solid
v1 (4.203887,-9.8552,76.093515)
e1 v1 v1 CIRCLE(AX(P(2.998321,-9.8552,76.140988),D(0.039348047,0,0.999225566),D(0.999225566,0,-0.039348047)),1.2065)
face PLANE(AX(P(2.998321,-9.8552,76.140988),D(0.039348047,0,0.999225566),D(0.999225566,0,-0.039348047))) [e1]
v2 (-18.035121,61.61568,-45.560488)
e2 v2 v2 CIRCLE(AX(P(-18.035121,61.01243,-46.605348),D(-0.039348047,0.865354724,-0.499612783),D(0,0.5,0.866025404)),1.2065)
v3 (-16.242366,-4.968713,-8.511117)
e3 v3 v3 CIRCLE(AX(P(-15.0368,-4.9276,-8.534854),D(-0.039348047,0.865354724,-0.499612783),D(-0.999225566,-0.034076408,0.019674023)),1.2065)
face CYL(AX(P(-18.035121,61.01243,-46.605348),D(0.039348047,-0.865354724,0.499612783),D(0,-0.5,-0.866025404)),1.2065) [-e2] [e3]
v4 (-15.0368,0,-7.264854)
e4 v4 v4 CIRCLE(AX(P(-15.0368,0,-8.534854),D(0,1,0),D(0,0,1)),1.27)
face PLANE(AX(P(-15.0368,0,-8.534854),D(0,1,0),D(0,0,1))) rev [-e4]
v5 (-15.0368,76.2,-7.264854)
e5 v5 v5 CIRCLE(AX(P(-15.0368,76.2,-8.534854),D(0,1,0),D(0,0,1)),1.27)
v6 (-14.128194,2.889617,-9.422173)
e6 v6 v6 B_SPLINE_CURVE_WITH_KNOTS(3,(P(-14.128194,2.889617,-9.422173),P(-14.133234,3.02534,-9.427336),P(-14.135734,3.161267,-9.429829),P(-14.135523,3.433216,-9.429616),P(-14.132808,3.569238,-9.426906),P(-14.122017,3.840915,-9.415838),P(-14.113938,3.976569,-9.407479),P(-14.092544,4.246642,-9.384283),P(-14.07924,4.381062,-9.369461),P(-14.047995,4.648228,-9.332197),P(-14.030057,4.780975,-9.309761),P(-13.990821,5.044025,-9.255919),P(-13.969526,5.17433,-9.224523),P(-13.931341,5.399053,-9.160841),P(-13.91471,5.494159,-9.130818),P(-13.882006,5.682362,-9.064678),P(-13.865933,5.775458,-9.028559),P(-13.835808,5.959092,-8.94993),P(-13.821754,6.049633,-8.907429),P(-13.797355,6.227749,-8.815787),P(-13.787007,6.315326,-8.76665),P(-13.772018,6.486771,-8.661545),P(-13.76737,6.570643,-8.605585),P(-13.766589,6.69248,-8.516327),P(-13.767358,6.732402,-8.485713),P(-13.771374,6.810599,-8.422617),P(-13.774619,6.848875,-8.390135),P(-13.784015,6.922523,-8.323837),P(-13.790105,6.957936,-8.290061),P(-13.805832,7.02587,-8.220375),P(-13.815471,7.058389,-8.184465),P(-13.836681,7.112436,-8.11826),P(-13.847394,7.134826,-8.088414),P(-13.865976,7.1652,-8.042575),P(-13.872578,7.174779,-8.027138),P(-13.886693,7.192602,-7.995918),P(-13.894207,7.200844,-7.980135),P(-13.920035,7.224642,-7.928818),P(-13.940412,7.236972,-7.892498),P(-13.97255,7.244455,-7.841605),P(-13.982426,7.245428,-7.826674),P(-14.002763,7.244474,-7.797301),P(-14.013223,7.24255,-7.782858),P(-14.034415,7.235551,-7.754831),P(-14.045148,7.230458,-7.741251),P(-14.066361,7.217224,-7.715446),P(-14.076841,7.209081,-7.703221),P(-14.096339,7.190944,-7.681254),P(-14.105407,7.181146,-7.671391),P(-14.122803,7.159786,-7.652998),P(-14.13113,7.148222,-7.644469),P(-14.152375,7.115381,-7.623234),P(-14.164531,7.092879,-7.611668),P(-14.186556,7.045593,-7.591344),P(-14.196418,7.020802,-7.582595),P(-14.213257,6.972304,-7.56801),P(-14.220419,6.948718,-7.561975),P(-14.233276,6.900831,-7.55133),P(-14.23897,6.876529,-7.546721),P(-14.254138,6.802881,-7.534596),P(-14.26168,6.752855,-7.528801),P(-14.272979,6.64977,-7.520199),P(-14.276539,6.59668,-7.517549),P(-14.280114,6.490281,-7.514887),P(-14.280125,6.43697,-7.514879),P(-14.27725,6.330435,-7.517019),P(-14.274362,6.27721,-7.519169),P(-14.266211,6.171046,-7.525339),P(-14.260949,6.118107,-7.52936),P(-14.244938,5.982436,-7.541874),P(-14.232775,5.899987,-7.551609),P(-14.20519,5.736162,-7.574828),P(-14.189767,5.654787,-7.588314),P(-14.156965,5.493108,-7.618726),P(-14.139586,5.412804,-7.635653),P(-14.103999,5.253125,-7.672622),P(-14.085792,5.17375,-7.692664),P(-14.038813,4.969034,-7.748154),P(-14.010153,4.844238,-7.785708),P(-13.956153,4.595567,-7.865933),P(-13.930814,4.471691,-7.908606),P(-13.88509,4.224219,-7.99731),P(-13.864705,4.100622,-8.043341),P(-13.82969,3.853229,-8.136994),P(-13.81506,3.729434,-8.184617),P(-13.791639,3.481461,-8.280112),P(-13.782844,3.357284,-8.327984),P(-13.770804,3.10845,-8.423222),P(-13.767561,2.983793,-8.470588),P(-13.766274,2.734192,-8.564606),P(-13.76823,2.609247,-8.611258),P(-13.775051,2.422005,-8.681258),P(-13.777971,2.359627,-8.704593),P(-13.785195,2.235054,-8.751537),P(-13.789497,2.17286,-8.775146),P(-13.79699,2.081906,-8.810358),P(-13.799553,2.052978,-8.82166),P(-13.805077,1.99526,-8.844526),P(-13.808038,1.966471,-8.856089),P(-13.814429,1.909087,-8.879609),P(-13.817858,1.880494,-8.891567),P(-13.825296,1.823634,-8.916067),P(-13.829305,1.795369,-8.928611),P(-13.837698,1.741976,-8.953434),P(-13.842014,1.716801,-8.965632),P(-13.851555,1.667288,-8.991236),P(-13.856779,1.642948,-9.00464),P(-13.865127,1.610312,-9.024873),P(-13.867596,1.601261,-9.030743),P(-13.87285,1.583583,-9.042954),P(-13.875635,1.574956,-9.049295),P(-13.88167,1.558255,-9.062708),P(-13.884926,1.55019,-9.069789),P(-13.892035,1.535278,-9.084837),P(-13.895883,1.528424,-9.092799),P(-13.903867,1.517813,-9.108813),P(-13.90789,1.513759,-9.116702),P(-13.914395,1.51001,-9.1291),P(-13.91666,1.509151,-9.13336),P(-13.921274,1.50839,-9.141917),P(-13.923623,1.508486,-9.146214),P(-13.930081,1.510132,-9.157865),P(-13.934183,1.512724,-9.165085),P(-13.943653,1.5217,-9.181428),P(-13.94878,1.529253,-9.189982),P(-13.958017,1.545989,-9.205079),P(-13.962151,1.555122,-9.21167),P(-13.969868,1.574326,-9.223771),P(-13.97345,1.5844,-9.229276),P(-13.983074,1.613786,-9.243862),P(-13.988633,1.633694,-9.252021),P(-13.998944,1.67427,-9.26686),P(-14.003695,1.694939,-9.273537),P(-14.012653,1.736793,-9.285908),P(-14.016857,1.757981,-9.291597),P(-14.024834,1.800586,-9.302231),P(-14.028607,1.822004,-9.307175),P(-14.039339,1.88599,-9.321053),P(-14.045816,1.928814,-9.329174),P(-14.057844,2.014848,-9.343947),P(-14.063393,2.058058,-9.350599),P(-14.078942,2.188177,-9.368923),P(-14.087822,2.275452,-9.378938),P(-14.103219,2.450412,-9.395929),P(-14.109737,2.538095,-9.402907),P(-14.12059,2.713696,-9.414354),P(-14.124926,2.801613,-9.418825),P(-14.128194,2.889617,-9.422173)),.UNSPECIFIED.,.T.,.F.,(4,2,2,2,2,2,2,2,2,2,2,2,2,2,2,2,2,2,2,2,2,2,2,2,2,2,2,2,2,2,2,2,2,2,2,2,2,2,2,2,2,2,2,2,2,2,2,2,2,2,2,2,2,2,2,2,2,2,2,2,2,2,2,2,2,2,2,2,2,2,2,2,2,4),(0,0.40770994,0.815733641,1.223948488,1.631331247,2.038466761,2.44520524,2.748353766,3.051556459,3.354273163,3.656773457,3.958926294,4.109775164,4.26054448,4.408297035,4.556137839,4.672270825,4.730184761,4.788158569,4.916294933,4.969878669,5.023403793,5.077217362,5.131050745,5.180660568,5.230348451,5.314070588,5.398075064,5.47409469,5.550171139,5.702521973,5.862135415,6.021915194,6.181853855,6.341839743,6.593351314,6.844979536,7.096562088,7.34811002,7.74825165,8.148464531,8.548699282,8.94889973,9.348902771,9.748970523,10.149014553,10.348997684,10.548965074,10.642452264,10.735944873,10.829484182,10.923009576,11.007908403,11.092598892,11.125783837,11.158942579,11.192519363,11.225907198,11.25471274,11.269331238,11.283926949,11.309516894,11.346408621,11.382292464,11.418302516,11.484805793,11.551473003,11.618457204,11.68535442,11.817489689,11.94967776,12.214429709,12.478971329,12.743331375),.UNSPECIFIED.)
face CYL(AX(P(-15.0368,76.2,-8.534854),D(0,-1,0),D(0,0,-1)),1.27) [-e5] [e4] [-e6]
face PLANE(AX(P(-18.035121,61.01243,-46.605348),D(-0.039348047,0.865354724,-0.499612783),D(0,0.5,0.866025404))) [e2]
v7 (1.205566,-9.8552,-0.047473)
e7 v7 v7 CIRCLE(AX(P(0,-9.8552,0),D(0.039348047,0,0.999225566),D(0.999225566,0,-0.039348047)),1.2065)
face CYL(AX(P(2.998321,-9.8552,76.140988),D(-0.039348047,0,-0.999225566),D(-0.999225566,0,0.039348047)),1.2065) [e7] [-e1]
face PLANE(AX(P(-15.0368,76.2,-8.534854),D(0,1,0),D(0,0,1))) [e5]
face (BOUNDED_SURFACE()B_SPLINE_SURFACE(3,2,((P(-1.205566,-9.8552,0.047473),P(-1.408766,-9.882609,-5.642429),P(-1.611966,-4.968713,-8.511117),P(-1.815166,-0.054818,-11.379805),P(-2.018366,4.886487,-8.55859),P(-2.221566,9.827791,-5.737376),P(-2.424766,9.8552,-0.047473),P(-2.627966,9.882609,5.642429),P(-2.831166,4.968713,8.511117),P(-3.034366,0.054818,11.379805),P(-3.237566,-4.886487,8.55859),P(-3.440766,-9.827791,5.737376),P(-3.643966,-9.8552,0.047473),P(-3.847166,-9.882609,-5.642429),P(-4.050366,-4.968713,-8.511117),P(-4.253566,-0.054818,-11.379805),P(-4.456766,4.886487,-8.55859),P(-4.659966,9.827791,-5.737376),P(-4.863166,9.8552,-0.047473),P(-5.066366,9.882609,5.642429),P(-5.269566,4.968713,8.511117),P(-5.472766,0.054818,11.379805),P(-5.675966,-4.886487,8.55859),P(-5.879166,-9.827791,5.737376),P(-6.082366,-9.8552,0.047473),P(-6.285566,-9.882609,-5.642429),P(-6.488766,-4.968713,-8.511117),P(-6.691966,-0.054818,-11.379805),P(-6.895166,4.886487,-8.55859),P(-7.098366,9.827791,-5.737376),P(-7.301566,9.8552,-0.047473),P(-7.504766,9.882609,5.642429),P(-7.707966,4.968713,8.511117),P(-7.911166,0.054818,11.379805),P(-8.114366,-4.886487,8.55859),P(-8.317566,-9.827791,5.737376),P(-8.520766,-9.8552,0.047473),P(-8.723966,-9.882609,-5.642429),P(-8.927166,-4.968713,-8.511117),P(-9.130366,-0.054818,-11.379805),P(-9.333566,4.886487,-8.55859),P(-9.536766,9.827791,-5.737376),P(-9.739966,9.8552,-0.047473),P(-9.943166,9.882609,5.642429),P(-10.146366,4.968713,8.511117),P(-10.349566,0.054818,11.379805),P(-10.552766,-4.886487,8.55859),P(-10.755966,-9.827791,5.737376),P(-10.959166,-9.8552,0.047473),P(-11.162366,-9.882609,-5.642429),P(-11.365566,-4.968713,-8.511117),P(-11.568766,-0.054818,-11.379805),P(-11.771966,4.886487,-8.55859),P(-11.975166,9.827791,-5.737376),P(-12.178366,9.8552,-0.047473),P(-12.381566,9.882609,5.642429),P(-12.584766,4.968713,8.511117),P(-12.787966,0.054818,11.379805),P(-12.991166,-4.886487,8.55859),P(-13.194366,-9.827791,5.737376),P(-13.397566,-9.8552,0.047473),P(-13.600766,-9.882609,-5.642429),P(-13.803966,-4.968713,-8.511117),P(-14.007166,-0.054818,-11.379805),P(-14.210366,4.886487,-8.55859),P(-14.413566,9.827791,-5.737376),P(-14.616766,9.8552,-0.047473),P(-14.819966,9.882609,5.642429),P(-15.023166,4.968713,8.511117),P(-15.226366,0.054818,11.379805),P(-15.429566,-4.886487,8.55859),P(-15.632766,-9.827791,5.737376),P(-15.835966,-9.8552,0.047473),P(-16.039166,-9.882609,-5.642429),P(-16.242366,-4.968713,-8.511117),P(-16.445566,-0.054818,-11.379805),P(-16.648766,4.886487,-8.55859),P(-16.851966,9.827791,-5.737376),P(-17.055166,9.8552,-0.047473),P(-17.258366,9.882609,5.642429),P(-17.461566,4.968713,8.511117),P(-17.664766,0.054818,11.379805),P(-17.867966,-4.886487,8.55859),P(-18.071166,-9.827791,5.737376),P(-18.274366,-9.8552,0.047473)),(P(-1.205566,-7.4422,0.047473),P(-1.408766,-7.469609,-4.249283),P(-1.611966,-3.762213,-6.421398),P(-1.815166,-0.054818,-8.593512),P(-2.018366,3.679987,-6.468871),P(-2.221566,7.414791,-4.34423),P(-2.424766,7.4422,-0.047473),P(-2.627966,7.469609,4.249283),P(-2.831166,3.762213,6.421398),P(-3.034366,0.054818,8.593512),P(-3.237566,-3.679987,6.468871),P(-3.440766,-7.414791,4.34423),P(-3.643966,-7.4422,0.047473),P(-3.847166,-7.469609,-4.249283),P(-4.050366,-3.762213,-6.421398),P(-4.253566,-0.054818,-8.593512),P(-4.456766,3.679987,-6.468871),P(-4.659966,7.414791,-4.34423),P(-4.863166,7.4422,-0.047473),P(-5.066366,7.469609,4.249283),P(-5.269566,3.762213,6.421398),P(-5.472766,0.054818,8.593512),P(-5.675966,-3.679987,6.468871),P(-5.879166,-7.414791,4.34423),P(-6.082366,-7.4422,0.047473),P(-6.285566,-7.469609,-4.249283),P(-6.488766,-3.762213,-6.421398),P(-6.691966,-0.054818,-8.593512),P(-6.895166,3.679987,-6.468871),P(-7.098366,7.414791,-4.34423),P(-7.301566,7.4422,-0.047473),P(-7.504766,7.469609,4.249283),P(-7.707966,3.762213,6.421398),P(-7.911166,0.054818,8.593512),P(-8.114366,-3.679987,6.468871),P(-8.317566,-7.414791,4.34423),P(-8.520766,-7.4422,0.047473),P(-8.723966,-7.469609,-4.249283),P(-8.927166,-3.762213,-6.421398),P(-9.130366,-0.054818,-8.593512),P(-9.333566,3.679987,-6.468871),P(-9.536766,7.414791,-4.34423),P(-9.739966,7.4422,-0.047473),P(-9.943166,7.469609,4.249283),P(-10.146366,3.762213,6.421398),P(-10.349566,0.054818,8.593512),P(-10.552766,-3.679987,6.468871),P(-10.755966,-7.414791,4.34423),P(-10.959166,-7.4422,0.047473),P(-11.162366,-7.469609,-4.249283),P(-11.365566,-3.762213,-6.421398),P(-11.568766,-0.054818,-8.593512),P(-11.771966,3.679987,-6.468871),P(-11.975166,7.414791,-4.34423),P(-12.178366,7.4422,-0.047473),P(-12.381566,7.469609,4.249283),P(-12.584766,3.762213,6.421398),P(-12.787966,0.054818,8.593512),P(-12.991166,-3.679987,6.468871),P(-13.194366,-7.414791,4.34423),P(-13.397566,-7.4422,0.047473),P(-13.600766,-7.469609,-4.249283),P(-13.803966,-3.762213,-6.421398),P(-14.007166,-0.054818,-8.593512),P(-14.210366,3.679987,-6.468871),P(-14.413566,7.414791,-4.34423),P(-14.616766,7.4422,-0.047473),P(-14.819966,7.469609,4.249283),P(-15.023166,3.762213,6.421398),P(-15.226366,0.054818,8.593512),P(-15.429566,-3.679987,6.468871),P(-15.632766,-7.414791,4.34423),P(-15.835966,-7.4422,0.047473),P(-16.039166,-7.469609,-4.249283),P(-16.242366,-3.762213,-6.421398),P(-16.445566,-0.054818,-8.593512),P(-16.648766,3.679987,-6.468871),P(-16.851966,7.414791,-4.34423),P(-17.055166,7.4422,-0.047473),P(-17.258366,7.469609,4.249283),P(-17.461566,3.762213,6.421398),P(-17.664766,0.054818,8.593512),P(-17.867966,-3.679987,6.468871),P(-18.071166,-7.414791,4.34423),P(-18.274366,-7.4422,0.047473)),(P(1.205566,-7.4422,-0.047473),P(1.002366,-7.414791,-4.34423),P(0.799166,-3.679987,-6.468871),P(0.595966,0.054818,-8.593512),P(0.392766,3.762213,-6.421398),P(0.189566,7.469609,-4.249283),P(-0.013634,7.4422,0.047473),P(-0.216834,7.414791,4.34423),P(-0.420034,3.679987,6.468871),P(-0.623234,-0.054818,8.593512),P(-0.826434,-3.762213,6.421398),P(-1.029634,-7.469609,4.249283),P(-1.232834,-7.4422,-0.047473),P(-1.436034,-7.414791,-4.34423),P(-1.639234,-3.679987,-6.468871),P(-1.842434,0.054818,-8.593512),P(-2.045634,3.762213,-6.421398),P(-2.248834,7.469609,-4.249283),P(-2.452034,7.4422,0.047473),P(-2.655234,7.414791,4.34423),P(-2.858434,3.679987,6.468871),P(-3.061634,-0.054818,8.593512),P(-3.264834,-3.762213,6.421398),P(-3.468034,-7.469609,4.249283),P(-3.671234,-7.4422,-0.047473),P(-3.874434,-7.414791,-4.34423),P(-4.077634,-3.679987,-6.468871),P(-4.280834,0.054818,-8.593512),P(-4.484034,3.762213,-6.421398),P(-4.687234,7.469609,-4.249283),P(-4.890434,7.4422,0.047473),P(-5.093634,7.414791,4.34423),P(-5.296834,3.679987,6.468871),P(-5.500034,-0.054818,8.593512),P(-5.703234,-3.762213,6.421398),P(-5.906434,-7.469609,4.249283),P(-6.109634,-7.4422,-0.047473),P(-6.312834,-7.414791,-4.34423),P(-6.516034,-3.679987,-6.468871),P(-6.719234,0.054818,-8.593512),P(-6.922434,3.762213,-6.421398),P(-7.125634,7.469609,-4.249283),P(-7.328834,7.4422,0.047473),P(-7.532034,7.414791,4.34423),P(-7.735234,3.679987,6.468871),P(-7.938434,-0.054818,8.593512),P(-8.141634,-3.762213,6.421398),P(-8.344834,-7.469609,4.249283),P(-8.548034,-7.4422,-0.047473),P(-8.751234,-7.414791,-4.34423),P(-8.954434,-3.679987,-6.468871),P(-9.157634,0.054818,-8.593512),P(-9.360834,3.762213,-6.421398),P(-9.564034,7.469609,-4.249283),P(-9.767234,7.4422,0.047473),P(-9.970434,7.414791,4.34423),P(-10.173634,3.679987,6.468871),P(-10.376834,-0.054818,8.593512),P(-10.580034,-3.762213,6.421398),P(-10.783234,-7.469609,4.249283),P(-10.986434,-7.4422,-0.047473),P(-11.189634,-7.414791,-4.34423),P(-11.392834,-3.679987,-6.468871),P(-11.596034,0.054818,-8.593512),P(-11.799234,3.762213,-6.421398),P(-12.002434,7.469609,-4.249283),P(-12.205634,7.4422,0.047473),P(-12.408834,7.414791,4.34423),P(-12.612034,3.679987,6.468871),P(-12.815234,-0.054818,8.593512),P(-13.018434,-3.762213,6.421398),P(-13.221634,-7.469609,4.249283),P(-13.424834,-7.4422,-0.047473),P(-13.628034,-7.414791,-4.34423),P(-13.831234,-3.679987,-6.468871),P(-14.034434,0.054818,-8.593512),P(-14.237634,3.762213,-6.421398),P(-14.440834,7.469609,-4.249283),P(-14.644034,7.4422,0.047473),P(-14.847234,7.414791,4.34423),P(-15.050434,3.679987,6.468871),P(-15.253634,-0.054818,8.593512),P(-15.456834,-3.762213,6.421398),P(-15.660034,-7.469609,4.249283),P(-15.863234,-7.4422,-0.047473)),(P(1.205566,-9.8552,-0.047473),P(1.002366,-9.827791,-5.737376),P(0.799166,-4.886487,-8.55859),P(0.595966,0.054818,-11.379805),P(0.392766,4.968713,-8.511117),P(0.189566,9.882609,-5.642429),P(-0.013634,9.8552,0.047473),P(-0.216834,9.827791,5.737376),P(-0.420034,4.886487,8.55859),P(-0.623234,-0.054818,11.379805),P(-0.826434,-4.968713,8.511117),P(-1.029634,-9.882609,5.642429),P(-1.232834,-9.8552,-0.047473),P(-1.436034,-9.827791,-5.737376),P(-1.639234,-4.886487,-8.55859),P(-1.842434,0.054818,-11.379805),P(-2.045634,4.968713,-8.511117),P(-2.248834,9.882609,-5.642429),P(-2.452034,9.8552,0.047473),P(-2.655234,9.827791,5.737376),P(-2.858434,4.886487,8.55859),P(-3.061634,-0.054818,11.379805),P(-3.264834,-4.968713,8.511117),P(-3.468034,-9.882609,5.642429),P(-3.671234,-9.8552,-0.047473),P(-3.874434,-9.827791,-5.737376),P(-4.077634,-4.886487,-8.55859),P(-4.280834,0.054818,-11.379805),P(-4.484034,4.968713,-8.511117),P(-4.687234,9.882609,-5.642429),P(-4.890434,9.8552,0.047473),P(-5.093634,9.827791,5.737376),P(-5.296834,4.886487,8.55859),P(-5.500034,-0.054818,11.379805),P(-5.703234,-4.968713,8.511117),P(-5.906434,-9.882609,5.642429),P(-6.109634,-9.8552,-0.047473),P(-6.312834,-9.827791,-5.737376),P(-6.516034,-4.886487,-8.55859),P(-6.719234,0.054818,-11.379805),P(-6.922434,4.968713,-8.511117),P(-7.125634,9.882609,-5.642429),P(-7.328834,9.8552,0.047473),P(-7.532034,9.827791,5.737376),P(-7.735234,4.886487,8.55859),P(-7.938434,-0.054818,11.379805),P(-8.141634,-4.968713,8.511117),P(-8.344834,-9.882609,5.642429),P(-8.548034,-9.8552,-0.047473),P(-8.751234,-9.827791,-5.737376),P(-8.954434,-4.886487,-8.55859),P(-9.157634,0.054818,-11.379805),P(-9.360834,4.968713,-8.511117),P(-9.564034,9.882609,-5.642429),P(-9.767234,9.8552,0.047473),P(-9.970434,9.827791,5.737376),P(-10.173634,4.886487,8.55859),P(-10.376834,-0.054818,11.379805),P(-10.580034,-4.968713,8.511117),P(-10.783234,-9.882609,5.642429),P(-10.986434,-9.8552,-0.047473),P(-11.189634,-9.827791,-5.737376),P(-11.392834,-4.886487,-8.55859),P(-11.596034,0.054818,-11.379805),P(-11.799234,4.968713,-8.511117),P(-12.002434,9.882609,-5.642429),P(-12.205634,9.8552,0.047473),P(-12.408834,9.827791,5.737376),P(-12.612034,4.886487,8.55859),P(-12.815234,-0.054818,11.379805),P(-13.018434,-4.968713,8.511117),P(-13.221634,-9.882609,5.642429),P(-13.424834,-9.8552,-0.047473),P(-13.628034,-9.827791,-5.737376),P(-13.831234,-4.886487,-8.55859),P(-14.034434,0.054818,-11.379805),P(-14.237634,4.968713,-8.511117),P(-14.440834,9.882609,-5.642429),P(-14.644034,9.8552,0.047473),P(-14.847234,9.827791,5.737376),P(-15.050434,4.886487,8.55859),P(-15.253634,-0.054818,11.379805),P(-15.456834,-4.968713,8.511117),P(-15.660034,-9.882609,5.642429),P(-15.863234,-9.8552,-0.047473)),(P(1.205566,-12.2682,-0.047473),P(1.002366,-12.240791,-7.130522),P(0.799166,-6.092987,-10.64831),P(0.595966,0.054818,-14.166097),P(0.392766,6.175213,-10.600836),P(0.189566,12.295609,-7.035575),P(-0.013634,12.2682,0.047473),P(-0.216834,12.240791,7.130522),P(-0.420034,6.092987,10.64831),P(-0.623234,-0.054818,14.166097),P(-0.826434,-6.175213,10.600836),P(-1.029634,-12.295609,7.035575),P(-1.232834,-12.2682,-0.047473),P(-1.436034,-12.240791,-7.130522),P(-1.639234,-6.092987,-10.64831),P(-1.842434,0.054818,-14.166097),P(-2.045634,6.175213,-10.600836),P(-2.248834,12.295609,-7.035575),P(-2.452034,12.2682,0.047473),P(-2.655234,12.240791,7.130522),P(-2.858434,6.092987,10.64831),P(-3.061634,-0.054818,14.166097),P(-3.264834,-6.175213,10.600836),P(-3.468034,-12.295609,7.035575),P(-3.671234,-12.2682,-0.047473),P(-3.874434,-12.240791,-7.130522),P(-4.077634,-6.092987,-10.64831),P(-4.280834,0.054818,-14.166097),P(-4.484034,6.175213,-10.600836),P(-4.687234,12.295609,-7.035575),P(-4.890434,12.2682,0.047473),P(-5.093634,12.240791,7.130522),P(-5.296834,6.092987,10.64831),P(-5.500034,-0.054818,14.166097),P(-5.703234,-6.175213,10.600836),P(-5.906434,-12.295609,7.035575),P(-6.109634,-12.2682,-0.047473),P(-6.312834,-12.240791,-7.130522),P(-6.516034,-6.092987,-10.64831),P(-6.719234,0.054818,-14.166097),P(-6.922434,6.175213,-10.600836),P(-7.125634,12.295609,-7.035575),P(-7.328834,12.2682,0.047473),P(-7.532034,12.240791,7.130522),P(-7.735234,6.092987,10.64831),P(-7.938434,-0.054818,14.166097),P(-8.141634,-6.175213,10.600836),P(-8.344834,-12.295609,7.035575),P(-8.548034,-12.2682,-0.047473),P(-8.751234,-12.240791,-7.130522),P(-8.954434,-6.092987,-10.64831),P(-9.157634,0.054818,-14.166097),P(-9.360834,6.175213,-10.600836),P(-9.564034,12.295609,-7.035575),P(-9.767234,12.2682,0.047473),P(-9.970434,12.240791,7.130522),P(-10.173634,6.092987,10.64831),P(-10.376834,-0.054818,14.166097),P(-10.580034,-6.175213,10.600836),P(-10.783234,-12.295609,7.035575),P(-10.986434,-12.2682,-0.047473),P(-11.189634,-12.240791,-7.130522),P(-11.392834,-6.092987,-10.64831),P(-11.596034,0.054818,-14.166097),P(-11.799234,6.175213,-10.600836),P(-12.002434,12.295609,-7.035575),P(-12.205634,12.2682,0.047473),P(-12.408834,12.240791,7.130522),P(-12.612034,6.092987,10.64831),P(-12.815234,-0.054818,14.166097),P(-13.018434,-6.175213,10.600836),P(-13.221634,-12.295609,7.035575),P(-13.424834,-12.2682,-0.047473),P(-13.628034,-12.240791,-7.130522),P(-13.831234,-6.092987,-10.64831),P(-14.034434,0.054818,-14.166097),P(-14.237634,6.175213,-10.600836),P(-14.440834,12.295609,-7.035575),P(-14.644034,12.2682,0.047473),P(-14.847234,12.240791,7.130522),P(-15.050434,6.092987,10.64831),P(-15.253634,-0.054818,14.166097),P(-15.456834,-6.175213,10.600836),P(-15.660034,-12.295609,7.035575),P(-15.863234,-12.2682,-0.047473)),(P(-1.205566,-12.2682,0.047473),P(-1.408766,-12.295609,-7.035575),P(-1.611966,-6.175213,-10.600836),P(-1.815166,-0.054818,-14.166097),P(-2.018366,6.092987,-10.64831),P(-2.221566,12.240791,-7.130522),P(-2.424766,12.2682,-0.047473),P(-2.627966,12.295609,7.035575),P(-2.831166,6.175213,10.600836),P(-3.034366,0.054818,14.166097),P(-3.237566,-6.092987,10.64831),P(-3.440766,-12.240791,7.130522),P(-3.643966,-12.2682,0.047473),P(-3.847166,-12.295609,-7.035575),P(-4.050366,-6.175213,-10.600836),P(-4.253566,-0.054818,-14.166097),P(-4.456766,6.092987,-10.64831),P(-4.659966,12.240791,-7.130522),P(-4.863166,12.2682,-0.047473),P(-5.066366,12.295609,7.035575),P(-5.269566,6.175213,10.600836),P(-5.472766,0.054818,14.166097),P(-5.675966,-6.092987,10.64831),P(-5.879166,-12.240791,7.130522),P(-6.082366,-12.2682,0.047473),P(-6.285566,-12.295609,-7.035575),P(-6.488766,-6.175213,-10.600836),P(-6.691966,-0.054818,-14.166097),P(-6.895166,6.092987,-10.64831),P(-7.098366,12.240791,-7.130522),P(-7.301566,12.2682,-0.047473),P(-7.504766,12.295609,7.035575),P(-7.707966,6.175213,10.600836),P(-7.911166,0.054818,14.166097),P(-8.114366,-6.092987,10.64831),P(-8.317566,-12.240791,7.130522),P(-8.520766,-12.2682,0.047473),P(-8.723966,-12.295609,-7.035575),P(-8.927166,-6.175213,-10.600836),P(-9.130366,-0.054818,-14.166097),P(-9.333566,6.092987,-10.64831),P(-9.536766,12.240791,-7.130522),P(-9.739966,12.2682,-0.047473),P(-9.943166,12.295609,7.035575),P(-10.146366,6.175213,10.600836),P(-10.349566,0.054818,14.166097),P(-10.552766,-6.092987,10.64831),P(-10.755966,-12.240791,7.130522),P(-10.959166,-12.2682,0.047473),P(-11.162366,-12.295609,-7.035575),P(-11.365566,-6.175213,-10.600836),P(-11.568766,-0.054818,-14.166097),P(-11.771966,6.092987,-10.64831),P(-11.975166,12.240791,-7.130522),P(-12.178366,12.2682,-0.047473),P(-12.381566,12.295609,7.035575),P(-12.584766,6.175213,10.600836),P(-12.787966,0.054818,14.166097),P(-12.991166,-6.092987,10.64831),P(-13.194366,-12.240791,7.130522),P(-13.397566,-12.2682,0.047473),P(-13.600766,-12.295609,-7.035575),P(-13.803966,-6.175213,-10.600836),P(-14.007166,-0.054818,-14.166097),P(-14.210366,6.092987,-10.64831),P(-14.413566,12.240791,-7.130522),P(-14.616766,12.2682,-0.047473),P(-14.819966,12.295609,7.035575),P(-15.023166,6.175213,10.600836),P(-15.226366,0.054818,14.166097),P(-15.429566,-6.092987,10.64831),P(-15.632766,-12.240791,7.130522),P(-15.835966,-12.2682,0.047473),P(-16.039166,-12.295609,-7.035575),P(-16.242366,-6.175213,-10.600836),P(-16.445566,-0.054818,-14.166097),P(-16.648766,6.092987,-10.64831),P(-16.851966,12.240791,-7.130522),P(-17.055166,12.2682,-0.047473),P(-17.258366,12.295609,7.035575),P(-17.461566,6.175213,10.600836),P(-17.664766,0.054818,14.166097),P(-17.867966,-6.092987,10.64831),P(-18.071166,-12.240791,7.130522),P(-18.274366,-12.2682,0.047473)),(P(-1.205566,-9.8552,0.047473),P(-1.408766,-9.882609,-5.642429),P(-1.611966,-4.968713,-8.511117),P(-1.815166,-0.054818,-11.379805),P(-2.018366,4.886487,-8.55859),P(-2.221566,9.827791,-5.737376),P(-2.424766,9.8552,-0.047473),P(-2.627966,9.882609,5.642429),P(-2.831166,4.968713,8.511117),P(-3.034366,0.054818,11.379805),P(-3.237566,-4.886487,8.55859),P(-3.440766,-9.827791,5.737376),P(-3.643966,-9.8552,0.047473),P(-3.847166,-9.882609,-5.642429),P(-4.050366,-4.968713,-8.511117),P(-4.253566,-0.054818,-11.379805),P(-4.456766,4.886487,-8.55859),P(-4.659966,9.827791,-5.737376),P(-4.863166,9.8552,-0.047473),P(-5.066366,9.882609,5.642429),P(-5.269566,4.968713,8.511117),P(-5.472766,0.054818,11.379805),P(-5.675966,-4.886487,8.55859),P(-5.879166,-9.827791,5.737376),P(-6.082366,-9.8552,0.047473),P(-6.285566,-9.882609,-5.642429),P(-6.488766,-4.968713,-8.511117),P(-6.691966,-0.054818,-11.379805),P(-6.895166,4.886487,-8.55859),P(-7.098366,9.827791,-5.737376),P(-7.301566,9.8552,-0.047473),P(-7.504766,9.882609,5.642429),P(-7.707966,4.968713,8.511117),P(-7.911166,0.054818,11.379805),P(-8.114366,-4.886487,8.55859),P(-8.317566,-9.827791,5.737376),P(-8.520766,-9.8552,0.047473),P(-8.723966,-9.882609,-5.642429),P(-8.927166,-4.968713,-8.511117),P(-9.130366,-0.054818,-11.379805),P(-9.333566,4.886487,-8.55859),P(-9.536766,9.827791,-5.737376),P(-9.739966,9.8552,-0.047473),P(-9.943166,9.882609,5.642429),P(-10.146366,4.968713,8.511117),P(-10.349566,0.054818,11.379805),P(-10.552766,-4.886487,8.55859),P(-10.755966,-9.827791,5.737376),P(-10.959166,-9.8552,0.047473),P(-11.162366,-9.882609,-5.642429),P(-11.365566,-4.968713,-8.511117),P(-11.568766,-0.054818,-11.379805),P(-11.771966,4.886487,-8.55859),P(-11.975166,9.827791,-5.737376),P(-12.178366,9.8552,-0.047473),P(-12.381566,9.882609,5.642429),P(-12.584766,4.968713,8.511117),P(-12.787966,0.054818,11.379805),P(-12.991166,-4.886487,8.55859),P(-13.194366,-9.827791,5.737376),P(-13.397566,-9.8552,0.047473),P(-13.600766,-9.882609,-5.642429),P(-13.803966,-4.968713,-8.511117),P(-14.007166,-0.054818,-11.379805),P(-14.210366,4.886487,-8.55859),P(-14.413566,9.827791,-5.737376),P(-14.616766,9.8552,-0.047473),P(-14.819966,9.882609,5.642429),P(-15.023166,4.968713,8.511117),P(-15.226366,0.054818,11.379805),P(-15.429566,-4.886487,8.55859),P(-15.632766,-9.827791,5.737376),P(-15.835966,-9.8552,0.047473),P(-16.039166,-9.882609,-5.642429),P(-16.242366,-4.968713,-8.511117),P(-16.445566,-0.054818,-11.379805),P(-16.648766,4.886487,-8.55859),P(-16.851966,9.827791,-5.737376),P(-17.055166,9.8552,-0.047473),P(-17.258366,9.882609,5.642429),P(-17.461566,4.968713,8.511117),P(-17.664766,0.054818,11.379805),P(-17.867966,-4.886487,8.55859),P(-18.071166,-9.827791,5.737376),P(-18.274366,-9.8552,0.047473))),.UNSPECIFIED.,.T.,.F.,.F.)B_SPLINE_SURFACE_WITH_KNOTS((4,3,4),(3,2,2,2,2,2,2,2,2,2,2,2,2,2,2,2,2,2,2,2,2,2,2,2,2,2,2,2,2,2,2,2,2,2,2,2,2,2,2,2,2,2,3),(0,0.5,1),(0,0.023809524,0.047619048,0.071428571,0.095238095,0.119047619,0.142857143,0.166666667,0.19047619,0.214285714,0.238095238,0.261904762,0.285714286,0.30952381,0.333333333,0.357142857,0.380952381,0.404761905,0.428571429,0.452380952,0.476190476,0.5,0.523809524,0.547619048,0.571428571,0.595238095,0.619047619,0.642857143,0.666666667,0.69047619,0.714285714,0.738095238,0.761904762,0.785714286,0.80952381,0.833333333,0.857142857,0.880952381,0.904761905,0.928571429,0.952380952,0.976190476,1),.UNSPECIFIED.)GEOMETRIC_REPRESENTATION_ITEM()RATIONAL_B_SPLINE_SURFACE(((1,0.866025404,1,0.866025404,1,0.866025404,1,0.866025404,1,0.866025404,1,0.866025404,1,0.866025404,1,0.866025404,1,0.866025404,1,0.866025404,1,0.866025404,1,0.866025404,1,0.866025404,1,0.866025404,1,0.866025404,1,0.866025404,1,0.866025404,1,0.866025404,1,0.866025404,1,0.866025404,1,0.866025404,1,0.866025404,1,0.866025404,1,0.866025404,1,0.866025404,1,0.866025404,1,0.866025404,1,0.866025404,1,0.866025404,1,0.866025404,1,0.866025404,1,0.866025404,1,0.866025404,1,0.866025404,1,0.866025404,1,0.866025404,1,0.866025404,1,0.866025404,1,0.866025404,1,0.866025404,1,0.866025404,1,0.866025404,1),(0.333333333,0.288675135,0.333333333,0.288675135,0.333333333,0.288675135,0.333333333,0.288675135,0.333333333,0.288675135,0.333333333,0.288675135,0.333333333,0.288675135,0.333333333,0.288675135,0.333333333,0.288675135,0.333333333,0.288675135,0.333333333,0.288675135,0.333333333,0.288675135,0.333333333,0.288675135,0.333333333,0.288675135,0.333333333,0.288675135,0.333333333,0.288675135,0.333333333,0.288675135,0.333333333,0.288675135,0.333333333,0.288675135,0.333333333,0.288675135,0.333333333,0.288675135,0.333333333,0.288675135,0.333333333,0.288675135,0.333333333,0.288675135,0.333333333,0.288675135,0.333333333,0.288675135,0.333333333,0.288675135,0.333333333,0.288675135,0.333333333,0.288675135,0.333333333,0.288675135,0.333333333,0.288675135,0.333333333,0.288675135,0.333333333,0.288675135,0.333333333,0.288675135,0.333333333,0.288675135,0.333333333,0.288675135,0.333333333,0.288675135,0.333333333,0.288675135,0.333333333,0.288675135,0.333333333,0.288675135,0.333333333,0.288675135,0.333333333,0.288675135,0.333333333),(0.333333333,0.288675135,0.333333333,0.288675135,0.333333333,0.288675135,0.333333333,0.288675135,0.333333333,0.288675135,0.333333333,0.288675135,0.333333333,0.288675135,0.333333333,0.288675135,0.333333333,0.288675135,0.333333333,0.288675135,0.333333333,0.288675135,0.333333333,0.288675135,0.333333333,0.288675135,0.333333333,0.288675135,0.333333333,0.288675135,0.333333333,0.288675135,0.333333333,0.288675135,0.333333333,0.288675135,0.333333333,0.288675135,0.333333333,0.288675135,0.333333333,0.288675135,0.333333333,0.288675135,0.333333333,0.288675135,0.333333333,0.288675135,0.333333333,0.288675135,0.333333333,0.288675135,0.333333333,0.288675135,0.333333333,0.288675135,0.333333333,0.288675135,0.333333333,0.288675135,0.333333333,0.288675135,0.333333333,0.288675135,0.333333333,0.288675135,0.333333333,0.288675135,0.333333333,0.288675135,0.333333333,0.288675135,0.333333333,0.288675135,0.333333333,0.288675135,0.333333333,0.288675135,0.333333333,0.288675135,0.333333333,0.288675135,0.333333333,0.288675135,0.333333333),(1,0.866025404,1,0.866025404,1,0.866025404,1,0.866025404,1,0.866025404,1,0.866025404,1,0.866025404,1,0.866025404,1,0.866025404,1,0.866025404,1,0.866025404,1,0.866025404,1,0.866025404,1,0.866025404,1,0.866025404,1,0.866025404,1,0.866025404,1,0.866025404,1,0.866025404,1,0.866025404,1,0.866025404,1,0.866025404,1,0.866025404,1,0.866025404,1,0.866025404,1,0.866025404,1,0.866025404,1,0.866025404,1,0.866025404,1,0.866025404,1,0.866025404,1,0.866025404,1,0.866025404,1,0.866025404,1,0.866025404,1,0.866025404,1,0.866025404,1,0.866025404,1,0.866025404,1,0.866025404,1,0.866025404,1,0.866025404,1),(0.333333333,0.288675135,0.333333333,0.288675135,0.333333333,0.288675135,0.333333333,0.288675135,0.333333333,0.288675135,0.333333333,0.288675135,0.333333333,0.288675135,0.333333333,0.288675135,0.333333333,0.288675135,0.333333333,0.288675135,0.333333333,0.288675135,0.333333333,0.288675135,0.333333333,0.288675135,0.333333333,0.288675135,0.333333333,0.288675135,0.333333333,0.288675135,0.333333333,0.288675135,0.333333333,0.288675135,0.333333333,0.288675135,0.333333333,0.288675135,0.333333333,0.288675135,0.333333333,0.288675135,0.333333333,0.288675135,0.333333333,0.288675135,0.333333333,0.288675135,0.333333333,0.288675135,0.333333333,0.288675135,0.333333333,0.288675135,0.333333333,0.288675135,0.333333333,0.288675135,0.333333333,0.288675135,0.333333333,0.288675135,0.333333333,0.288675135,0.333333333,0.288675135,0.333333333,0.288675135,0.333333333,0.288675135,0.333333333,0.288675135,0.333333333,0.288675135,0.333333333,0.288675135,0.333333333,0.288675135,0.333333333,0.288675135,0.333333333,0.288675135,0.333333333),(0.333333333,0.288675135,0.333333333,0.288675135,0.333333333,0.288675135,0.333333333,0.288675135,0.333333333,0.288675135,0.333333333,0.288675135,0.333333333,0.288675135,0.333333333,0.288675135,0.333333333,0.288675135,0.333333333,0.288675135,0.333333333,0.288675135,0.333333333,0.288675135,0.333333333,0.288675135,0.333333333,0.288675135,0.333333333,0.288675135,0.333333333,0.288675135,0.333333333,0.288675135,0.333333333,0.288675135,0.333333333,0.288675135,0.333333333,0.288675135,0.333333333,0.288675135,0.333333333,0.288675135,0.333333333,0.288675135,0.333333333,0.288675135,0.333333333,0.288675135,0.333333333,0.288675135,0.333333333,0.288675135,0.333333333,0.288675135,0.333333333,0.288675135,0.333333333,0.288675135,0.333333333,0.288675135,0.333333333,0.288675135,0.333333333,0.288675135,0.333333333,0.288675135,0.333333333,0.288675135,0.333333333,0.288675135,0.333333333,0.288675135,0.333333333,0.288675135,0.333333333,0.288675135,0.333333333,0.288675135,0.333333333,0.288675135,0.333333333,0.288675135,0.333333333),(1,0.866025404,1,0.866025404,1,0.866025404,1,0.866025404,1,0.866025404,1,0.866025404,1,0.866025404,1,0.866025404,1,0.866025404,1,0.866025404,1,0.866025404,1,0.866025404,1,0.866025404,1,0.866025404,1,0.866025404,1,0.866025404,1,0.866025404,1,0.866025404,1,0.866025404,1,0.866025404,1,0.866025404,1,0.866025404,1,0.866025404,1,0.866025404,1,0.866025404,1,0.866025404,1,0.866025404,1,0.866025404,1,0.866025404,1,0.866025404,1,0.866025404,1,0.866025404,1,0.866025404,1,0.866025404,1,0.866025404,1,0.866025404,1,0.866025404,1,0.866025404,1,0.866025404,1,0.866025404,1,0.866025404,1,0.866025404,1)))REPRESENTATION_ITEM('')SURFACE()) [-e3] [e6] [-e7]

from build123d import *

# Parameters (mm, degrees)
SWEEP1_PITCH        = 2.4384
SKETCH4_R           = 1.2065
EXTRUDE1_DEPTH      = 76.2
SKETCH5_R           = 1.2065
EXTRUDE2_DEPTH      = 76.2
SKETCH7_R           = 1.27
BOSS_EXTRUDE1_DEPTH = 76.2


with BuildPart() as part:
    # Sweep1: the profile of Sketch3 screwed along a left-hand helix of 6.166667 turns, 6 arcs to a turn; built about Z, then put on its axis
    sweep1_z = Axis((0, 0, 0), (0, 0, 1))
    sweep1_corners = [(9.88323439, -0.047460601, -1.205240148), (11.061374251, 0.001103098, 0.028012679), (9.82716561, 0.047460601, 1.205240148), (8.649025749, -0.001103098, -0.028012679)]
    with BuildLine(mode=Mode.PRIVATE) as sweep1_profile:
        ThreePointArc((9.88323439, -0.047460601, -1.205240148), (10.727917299, -0.032779704, -0.832425526), (11.061374251, 0.001103098, 0.028012679))
        ThreePointArc((11.061374251, 0.001103098, 0.028012679), (10.688270685, 0.034339721, 0.872041437), (9.82716561, 0.047460601, 1.205240148))
        ThreePointArc((9.82716561, 0.047460601, 1.205240148), (8.982482701, 0.032779704, 0.832425526), (8.649025749, -0.001103098, -0.028012679))
        ThreePointArc((8.649025749, -0.001103098, -0.028012679), (9.022129315, -0.034339721, -0.872041437), (9.88323439, -0.047460601, -1.205240148))
    sweep1_cap = Face(sweep1_profile.wire())
    sweep1_arcs = [((9.88323439, -0.047460601, -1.205240148), (11.08940864, -0.046357502, -1.177227469), (11.061374251, 0.001103098, 0.028012679), (1, 0.7071067811865476, 1)), ((11.061374251, 0.001103098, 0.028012679), (11.033339861, 0.048563699, 1.233252827), (9.82716561, 0.047460601, 1.205240148), (1, 0.7071067811865476, 1)), ((9.82716561, 0.047460601, 1.205240148), (8.62099136, 0.046357502, 1.177227469), (8.649025749, -0.001103098, -0.028012679), (1, 0.7071067811865476, 1)), ((8.649025749, -0.001103098, -0.028012679), (8.677060139, -0.048563699, -1.233252827), (9.88323439, -0.047460601, -1.205240148), (1, 0.7071067811865476, 1))]  # start, shoulder, end, weights
    sweep1_turn_angles = [0, -30, -60, -90, -120, -150, -180, -210, -240, -270, -300, -330, -360]
    sweep1_turn_weights = [1, 0.8660254037844387, 1, 0.8660254037844387, 1, 0.8660254037844387, 1, 0.8660254037844387, 1, 0.8660254037844387, 1, 0.8660254037844387, 1]
    sweep1_turn_sides = [Face.make_bezier_surface([[Vector(p[j][0], p[j][1], 0).rotate(sweep1_z, sweep1_turn_angles[2 * i + k]) / sweep1_turn_weights[2 * i + k] + Vector(0, 0, p[j][2] + -SWEEP1_PITCH * sweep1_turn_angles[2 * i + k] / 360) for k in range(3)] for j in range(3)], [[p[3][j] * sweep1_turn_weights[2 * i + k] for k in range(3)] for j in range(3)]) for p in sweep1_arcs for i in range(6)]
    sweep1_last_angles = [-2160, -2190, -2220]
    sweep1_last_weights = [1, 0.866025403784403, 1]
    sweep1_last_sides = [Face.make_bezier_surface([[Vector(p[j][0], p[j][1], 0).rotate(sweep1_z, sweep1_last_angles[2 * i + k]) / sweep1_last_weights[2 * i + k] + Vector(0, 0, p[j][2] + -SWEEP1_PITCH * sweep1_last_angles[2 * i + k] / 360) for k in range(3)] for j in range(3)], [[p[3][j] * sweep1_last_weights[2 * i + k] for k in range(3)] for j in range(3)]) for p in sweep1_arcs for i in range(1)]
    sweep1 = Plane(origin=(0, 0, 0), x_dir=(0, -1, 0), z_dir=(-1, 0, 0)) * Solid(Shell([*[p.moved(Location((0, 0, SWEEP1_PITCH * i))) for i in range(6) for p in sweep1_turn_sides], *sweep1_last_sides, sweep1_cap, sweep1_cap.rotate(sweep1_z, -2220).moved(Location((0, 0, -SWEEP1_PITCH * -2220 / 360)))]))
    add(sweep1)

    # Sketch4 → Extrude1 (add)
    with BuildSketch(Plane(origin=(0, 0, 0), x_dir=(-0.9989557795402644, 0.023236129092747825, 0.03933742274079621), z_dir=(0.03934804652827866, -1.0745961412372829e-14, 0.9992255657429951))):
        with Locations(Location((-0.228996699, 9.852539142, 0), (0, 0, 181.33145196))):
            Circle(SKETCH4_R)
    extrude(amount=EXTRUDE1_DEPTH)

    # Sketch5 → Extrude2 (add)
    with BuildSketch(Plane(origin=(-0.023281008, 0.51200331, -0.295605249), x_dir=(0.9992255652040811, 0.03409282936814917, -0.019645580374703375), z_dir=(-0.03934804652827868, 0.8653547240443686, -0.4996127828713984))):
        with Locations(Location((-15.025478653, 9.854706523, 0), (0, 0, 180.001881766))):
            Circle(SKETCH5_R)
    extrude(amount=EXTRUDE2_DEPTH)

    # Sketch7 → Boss-Extrude1 (add)
    with BuildSketch(Plane(origin=(0, 0, 0), x_dir=(1, 0, 0), z_dir=(0, 1, 0))):
        with Locations(Location((-15.0368, 8.534853559, 0), (0, 0, 270))):
            Circle(SKETCH7_R)
    extrude(amount=BOSS_EXTRUDE1_DEPTH)


solid = part.part
